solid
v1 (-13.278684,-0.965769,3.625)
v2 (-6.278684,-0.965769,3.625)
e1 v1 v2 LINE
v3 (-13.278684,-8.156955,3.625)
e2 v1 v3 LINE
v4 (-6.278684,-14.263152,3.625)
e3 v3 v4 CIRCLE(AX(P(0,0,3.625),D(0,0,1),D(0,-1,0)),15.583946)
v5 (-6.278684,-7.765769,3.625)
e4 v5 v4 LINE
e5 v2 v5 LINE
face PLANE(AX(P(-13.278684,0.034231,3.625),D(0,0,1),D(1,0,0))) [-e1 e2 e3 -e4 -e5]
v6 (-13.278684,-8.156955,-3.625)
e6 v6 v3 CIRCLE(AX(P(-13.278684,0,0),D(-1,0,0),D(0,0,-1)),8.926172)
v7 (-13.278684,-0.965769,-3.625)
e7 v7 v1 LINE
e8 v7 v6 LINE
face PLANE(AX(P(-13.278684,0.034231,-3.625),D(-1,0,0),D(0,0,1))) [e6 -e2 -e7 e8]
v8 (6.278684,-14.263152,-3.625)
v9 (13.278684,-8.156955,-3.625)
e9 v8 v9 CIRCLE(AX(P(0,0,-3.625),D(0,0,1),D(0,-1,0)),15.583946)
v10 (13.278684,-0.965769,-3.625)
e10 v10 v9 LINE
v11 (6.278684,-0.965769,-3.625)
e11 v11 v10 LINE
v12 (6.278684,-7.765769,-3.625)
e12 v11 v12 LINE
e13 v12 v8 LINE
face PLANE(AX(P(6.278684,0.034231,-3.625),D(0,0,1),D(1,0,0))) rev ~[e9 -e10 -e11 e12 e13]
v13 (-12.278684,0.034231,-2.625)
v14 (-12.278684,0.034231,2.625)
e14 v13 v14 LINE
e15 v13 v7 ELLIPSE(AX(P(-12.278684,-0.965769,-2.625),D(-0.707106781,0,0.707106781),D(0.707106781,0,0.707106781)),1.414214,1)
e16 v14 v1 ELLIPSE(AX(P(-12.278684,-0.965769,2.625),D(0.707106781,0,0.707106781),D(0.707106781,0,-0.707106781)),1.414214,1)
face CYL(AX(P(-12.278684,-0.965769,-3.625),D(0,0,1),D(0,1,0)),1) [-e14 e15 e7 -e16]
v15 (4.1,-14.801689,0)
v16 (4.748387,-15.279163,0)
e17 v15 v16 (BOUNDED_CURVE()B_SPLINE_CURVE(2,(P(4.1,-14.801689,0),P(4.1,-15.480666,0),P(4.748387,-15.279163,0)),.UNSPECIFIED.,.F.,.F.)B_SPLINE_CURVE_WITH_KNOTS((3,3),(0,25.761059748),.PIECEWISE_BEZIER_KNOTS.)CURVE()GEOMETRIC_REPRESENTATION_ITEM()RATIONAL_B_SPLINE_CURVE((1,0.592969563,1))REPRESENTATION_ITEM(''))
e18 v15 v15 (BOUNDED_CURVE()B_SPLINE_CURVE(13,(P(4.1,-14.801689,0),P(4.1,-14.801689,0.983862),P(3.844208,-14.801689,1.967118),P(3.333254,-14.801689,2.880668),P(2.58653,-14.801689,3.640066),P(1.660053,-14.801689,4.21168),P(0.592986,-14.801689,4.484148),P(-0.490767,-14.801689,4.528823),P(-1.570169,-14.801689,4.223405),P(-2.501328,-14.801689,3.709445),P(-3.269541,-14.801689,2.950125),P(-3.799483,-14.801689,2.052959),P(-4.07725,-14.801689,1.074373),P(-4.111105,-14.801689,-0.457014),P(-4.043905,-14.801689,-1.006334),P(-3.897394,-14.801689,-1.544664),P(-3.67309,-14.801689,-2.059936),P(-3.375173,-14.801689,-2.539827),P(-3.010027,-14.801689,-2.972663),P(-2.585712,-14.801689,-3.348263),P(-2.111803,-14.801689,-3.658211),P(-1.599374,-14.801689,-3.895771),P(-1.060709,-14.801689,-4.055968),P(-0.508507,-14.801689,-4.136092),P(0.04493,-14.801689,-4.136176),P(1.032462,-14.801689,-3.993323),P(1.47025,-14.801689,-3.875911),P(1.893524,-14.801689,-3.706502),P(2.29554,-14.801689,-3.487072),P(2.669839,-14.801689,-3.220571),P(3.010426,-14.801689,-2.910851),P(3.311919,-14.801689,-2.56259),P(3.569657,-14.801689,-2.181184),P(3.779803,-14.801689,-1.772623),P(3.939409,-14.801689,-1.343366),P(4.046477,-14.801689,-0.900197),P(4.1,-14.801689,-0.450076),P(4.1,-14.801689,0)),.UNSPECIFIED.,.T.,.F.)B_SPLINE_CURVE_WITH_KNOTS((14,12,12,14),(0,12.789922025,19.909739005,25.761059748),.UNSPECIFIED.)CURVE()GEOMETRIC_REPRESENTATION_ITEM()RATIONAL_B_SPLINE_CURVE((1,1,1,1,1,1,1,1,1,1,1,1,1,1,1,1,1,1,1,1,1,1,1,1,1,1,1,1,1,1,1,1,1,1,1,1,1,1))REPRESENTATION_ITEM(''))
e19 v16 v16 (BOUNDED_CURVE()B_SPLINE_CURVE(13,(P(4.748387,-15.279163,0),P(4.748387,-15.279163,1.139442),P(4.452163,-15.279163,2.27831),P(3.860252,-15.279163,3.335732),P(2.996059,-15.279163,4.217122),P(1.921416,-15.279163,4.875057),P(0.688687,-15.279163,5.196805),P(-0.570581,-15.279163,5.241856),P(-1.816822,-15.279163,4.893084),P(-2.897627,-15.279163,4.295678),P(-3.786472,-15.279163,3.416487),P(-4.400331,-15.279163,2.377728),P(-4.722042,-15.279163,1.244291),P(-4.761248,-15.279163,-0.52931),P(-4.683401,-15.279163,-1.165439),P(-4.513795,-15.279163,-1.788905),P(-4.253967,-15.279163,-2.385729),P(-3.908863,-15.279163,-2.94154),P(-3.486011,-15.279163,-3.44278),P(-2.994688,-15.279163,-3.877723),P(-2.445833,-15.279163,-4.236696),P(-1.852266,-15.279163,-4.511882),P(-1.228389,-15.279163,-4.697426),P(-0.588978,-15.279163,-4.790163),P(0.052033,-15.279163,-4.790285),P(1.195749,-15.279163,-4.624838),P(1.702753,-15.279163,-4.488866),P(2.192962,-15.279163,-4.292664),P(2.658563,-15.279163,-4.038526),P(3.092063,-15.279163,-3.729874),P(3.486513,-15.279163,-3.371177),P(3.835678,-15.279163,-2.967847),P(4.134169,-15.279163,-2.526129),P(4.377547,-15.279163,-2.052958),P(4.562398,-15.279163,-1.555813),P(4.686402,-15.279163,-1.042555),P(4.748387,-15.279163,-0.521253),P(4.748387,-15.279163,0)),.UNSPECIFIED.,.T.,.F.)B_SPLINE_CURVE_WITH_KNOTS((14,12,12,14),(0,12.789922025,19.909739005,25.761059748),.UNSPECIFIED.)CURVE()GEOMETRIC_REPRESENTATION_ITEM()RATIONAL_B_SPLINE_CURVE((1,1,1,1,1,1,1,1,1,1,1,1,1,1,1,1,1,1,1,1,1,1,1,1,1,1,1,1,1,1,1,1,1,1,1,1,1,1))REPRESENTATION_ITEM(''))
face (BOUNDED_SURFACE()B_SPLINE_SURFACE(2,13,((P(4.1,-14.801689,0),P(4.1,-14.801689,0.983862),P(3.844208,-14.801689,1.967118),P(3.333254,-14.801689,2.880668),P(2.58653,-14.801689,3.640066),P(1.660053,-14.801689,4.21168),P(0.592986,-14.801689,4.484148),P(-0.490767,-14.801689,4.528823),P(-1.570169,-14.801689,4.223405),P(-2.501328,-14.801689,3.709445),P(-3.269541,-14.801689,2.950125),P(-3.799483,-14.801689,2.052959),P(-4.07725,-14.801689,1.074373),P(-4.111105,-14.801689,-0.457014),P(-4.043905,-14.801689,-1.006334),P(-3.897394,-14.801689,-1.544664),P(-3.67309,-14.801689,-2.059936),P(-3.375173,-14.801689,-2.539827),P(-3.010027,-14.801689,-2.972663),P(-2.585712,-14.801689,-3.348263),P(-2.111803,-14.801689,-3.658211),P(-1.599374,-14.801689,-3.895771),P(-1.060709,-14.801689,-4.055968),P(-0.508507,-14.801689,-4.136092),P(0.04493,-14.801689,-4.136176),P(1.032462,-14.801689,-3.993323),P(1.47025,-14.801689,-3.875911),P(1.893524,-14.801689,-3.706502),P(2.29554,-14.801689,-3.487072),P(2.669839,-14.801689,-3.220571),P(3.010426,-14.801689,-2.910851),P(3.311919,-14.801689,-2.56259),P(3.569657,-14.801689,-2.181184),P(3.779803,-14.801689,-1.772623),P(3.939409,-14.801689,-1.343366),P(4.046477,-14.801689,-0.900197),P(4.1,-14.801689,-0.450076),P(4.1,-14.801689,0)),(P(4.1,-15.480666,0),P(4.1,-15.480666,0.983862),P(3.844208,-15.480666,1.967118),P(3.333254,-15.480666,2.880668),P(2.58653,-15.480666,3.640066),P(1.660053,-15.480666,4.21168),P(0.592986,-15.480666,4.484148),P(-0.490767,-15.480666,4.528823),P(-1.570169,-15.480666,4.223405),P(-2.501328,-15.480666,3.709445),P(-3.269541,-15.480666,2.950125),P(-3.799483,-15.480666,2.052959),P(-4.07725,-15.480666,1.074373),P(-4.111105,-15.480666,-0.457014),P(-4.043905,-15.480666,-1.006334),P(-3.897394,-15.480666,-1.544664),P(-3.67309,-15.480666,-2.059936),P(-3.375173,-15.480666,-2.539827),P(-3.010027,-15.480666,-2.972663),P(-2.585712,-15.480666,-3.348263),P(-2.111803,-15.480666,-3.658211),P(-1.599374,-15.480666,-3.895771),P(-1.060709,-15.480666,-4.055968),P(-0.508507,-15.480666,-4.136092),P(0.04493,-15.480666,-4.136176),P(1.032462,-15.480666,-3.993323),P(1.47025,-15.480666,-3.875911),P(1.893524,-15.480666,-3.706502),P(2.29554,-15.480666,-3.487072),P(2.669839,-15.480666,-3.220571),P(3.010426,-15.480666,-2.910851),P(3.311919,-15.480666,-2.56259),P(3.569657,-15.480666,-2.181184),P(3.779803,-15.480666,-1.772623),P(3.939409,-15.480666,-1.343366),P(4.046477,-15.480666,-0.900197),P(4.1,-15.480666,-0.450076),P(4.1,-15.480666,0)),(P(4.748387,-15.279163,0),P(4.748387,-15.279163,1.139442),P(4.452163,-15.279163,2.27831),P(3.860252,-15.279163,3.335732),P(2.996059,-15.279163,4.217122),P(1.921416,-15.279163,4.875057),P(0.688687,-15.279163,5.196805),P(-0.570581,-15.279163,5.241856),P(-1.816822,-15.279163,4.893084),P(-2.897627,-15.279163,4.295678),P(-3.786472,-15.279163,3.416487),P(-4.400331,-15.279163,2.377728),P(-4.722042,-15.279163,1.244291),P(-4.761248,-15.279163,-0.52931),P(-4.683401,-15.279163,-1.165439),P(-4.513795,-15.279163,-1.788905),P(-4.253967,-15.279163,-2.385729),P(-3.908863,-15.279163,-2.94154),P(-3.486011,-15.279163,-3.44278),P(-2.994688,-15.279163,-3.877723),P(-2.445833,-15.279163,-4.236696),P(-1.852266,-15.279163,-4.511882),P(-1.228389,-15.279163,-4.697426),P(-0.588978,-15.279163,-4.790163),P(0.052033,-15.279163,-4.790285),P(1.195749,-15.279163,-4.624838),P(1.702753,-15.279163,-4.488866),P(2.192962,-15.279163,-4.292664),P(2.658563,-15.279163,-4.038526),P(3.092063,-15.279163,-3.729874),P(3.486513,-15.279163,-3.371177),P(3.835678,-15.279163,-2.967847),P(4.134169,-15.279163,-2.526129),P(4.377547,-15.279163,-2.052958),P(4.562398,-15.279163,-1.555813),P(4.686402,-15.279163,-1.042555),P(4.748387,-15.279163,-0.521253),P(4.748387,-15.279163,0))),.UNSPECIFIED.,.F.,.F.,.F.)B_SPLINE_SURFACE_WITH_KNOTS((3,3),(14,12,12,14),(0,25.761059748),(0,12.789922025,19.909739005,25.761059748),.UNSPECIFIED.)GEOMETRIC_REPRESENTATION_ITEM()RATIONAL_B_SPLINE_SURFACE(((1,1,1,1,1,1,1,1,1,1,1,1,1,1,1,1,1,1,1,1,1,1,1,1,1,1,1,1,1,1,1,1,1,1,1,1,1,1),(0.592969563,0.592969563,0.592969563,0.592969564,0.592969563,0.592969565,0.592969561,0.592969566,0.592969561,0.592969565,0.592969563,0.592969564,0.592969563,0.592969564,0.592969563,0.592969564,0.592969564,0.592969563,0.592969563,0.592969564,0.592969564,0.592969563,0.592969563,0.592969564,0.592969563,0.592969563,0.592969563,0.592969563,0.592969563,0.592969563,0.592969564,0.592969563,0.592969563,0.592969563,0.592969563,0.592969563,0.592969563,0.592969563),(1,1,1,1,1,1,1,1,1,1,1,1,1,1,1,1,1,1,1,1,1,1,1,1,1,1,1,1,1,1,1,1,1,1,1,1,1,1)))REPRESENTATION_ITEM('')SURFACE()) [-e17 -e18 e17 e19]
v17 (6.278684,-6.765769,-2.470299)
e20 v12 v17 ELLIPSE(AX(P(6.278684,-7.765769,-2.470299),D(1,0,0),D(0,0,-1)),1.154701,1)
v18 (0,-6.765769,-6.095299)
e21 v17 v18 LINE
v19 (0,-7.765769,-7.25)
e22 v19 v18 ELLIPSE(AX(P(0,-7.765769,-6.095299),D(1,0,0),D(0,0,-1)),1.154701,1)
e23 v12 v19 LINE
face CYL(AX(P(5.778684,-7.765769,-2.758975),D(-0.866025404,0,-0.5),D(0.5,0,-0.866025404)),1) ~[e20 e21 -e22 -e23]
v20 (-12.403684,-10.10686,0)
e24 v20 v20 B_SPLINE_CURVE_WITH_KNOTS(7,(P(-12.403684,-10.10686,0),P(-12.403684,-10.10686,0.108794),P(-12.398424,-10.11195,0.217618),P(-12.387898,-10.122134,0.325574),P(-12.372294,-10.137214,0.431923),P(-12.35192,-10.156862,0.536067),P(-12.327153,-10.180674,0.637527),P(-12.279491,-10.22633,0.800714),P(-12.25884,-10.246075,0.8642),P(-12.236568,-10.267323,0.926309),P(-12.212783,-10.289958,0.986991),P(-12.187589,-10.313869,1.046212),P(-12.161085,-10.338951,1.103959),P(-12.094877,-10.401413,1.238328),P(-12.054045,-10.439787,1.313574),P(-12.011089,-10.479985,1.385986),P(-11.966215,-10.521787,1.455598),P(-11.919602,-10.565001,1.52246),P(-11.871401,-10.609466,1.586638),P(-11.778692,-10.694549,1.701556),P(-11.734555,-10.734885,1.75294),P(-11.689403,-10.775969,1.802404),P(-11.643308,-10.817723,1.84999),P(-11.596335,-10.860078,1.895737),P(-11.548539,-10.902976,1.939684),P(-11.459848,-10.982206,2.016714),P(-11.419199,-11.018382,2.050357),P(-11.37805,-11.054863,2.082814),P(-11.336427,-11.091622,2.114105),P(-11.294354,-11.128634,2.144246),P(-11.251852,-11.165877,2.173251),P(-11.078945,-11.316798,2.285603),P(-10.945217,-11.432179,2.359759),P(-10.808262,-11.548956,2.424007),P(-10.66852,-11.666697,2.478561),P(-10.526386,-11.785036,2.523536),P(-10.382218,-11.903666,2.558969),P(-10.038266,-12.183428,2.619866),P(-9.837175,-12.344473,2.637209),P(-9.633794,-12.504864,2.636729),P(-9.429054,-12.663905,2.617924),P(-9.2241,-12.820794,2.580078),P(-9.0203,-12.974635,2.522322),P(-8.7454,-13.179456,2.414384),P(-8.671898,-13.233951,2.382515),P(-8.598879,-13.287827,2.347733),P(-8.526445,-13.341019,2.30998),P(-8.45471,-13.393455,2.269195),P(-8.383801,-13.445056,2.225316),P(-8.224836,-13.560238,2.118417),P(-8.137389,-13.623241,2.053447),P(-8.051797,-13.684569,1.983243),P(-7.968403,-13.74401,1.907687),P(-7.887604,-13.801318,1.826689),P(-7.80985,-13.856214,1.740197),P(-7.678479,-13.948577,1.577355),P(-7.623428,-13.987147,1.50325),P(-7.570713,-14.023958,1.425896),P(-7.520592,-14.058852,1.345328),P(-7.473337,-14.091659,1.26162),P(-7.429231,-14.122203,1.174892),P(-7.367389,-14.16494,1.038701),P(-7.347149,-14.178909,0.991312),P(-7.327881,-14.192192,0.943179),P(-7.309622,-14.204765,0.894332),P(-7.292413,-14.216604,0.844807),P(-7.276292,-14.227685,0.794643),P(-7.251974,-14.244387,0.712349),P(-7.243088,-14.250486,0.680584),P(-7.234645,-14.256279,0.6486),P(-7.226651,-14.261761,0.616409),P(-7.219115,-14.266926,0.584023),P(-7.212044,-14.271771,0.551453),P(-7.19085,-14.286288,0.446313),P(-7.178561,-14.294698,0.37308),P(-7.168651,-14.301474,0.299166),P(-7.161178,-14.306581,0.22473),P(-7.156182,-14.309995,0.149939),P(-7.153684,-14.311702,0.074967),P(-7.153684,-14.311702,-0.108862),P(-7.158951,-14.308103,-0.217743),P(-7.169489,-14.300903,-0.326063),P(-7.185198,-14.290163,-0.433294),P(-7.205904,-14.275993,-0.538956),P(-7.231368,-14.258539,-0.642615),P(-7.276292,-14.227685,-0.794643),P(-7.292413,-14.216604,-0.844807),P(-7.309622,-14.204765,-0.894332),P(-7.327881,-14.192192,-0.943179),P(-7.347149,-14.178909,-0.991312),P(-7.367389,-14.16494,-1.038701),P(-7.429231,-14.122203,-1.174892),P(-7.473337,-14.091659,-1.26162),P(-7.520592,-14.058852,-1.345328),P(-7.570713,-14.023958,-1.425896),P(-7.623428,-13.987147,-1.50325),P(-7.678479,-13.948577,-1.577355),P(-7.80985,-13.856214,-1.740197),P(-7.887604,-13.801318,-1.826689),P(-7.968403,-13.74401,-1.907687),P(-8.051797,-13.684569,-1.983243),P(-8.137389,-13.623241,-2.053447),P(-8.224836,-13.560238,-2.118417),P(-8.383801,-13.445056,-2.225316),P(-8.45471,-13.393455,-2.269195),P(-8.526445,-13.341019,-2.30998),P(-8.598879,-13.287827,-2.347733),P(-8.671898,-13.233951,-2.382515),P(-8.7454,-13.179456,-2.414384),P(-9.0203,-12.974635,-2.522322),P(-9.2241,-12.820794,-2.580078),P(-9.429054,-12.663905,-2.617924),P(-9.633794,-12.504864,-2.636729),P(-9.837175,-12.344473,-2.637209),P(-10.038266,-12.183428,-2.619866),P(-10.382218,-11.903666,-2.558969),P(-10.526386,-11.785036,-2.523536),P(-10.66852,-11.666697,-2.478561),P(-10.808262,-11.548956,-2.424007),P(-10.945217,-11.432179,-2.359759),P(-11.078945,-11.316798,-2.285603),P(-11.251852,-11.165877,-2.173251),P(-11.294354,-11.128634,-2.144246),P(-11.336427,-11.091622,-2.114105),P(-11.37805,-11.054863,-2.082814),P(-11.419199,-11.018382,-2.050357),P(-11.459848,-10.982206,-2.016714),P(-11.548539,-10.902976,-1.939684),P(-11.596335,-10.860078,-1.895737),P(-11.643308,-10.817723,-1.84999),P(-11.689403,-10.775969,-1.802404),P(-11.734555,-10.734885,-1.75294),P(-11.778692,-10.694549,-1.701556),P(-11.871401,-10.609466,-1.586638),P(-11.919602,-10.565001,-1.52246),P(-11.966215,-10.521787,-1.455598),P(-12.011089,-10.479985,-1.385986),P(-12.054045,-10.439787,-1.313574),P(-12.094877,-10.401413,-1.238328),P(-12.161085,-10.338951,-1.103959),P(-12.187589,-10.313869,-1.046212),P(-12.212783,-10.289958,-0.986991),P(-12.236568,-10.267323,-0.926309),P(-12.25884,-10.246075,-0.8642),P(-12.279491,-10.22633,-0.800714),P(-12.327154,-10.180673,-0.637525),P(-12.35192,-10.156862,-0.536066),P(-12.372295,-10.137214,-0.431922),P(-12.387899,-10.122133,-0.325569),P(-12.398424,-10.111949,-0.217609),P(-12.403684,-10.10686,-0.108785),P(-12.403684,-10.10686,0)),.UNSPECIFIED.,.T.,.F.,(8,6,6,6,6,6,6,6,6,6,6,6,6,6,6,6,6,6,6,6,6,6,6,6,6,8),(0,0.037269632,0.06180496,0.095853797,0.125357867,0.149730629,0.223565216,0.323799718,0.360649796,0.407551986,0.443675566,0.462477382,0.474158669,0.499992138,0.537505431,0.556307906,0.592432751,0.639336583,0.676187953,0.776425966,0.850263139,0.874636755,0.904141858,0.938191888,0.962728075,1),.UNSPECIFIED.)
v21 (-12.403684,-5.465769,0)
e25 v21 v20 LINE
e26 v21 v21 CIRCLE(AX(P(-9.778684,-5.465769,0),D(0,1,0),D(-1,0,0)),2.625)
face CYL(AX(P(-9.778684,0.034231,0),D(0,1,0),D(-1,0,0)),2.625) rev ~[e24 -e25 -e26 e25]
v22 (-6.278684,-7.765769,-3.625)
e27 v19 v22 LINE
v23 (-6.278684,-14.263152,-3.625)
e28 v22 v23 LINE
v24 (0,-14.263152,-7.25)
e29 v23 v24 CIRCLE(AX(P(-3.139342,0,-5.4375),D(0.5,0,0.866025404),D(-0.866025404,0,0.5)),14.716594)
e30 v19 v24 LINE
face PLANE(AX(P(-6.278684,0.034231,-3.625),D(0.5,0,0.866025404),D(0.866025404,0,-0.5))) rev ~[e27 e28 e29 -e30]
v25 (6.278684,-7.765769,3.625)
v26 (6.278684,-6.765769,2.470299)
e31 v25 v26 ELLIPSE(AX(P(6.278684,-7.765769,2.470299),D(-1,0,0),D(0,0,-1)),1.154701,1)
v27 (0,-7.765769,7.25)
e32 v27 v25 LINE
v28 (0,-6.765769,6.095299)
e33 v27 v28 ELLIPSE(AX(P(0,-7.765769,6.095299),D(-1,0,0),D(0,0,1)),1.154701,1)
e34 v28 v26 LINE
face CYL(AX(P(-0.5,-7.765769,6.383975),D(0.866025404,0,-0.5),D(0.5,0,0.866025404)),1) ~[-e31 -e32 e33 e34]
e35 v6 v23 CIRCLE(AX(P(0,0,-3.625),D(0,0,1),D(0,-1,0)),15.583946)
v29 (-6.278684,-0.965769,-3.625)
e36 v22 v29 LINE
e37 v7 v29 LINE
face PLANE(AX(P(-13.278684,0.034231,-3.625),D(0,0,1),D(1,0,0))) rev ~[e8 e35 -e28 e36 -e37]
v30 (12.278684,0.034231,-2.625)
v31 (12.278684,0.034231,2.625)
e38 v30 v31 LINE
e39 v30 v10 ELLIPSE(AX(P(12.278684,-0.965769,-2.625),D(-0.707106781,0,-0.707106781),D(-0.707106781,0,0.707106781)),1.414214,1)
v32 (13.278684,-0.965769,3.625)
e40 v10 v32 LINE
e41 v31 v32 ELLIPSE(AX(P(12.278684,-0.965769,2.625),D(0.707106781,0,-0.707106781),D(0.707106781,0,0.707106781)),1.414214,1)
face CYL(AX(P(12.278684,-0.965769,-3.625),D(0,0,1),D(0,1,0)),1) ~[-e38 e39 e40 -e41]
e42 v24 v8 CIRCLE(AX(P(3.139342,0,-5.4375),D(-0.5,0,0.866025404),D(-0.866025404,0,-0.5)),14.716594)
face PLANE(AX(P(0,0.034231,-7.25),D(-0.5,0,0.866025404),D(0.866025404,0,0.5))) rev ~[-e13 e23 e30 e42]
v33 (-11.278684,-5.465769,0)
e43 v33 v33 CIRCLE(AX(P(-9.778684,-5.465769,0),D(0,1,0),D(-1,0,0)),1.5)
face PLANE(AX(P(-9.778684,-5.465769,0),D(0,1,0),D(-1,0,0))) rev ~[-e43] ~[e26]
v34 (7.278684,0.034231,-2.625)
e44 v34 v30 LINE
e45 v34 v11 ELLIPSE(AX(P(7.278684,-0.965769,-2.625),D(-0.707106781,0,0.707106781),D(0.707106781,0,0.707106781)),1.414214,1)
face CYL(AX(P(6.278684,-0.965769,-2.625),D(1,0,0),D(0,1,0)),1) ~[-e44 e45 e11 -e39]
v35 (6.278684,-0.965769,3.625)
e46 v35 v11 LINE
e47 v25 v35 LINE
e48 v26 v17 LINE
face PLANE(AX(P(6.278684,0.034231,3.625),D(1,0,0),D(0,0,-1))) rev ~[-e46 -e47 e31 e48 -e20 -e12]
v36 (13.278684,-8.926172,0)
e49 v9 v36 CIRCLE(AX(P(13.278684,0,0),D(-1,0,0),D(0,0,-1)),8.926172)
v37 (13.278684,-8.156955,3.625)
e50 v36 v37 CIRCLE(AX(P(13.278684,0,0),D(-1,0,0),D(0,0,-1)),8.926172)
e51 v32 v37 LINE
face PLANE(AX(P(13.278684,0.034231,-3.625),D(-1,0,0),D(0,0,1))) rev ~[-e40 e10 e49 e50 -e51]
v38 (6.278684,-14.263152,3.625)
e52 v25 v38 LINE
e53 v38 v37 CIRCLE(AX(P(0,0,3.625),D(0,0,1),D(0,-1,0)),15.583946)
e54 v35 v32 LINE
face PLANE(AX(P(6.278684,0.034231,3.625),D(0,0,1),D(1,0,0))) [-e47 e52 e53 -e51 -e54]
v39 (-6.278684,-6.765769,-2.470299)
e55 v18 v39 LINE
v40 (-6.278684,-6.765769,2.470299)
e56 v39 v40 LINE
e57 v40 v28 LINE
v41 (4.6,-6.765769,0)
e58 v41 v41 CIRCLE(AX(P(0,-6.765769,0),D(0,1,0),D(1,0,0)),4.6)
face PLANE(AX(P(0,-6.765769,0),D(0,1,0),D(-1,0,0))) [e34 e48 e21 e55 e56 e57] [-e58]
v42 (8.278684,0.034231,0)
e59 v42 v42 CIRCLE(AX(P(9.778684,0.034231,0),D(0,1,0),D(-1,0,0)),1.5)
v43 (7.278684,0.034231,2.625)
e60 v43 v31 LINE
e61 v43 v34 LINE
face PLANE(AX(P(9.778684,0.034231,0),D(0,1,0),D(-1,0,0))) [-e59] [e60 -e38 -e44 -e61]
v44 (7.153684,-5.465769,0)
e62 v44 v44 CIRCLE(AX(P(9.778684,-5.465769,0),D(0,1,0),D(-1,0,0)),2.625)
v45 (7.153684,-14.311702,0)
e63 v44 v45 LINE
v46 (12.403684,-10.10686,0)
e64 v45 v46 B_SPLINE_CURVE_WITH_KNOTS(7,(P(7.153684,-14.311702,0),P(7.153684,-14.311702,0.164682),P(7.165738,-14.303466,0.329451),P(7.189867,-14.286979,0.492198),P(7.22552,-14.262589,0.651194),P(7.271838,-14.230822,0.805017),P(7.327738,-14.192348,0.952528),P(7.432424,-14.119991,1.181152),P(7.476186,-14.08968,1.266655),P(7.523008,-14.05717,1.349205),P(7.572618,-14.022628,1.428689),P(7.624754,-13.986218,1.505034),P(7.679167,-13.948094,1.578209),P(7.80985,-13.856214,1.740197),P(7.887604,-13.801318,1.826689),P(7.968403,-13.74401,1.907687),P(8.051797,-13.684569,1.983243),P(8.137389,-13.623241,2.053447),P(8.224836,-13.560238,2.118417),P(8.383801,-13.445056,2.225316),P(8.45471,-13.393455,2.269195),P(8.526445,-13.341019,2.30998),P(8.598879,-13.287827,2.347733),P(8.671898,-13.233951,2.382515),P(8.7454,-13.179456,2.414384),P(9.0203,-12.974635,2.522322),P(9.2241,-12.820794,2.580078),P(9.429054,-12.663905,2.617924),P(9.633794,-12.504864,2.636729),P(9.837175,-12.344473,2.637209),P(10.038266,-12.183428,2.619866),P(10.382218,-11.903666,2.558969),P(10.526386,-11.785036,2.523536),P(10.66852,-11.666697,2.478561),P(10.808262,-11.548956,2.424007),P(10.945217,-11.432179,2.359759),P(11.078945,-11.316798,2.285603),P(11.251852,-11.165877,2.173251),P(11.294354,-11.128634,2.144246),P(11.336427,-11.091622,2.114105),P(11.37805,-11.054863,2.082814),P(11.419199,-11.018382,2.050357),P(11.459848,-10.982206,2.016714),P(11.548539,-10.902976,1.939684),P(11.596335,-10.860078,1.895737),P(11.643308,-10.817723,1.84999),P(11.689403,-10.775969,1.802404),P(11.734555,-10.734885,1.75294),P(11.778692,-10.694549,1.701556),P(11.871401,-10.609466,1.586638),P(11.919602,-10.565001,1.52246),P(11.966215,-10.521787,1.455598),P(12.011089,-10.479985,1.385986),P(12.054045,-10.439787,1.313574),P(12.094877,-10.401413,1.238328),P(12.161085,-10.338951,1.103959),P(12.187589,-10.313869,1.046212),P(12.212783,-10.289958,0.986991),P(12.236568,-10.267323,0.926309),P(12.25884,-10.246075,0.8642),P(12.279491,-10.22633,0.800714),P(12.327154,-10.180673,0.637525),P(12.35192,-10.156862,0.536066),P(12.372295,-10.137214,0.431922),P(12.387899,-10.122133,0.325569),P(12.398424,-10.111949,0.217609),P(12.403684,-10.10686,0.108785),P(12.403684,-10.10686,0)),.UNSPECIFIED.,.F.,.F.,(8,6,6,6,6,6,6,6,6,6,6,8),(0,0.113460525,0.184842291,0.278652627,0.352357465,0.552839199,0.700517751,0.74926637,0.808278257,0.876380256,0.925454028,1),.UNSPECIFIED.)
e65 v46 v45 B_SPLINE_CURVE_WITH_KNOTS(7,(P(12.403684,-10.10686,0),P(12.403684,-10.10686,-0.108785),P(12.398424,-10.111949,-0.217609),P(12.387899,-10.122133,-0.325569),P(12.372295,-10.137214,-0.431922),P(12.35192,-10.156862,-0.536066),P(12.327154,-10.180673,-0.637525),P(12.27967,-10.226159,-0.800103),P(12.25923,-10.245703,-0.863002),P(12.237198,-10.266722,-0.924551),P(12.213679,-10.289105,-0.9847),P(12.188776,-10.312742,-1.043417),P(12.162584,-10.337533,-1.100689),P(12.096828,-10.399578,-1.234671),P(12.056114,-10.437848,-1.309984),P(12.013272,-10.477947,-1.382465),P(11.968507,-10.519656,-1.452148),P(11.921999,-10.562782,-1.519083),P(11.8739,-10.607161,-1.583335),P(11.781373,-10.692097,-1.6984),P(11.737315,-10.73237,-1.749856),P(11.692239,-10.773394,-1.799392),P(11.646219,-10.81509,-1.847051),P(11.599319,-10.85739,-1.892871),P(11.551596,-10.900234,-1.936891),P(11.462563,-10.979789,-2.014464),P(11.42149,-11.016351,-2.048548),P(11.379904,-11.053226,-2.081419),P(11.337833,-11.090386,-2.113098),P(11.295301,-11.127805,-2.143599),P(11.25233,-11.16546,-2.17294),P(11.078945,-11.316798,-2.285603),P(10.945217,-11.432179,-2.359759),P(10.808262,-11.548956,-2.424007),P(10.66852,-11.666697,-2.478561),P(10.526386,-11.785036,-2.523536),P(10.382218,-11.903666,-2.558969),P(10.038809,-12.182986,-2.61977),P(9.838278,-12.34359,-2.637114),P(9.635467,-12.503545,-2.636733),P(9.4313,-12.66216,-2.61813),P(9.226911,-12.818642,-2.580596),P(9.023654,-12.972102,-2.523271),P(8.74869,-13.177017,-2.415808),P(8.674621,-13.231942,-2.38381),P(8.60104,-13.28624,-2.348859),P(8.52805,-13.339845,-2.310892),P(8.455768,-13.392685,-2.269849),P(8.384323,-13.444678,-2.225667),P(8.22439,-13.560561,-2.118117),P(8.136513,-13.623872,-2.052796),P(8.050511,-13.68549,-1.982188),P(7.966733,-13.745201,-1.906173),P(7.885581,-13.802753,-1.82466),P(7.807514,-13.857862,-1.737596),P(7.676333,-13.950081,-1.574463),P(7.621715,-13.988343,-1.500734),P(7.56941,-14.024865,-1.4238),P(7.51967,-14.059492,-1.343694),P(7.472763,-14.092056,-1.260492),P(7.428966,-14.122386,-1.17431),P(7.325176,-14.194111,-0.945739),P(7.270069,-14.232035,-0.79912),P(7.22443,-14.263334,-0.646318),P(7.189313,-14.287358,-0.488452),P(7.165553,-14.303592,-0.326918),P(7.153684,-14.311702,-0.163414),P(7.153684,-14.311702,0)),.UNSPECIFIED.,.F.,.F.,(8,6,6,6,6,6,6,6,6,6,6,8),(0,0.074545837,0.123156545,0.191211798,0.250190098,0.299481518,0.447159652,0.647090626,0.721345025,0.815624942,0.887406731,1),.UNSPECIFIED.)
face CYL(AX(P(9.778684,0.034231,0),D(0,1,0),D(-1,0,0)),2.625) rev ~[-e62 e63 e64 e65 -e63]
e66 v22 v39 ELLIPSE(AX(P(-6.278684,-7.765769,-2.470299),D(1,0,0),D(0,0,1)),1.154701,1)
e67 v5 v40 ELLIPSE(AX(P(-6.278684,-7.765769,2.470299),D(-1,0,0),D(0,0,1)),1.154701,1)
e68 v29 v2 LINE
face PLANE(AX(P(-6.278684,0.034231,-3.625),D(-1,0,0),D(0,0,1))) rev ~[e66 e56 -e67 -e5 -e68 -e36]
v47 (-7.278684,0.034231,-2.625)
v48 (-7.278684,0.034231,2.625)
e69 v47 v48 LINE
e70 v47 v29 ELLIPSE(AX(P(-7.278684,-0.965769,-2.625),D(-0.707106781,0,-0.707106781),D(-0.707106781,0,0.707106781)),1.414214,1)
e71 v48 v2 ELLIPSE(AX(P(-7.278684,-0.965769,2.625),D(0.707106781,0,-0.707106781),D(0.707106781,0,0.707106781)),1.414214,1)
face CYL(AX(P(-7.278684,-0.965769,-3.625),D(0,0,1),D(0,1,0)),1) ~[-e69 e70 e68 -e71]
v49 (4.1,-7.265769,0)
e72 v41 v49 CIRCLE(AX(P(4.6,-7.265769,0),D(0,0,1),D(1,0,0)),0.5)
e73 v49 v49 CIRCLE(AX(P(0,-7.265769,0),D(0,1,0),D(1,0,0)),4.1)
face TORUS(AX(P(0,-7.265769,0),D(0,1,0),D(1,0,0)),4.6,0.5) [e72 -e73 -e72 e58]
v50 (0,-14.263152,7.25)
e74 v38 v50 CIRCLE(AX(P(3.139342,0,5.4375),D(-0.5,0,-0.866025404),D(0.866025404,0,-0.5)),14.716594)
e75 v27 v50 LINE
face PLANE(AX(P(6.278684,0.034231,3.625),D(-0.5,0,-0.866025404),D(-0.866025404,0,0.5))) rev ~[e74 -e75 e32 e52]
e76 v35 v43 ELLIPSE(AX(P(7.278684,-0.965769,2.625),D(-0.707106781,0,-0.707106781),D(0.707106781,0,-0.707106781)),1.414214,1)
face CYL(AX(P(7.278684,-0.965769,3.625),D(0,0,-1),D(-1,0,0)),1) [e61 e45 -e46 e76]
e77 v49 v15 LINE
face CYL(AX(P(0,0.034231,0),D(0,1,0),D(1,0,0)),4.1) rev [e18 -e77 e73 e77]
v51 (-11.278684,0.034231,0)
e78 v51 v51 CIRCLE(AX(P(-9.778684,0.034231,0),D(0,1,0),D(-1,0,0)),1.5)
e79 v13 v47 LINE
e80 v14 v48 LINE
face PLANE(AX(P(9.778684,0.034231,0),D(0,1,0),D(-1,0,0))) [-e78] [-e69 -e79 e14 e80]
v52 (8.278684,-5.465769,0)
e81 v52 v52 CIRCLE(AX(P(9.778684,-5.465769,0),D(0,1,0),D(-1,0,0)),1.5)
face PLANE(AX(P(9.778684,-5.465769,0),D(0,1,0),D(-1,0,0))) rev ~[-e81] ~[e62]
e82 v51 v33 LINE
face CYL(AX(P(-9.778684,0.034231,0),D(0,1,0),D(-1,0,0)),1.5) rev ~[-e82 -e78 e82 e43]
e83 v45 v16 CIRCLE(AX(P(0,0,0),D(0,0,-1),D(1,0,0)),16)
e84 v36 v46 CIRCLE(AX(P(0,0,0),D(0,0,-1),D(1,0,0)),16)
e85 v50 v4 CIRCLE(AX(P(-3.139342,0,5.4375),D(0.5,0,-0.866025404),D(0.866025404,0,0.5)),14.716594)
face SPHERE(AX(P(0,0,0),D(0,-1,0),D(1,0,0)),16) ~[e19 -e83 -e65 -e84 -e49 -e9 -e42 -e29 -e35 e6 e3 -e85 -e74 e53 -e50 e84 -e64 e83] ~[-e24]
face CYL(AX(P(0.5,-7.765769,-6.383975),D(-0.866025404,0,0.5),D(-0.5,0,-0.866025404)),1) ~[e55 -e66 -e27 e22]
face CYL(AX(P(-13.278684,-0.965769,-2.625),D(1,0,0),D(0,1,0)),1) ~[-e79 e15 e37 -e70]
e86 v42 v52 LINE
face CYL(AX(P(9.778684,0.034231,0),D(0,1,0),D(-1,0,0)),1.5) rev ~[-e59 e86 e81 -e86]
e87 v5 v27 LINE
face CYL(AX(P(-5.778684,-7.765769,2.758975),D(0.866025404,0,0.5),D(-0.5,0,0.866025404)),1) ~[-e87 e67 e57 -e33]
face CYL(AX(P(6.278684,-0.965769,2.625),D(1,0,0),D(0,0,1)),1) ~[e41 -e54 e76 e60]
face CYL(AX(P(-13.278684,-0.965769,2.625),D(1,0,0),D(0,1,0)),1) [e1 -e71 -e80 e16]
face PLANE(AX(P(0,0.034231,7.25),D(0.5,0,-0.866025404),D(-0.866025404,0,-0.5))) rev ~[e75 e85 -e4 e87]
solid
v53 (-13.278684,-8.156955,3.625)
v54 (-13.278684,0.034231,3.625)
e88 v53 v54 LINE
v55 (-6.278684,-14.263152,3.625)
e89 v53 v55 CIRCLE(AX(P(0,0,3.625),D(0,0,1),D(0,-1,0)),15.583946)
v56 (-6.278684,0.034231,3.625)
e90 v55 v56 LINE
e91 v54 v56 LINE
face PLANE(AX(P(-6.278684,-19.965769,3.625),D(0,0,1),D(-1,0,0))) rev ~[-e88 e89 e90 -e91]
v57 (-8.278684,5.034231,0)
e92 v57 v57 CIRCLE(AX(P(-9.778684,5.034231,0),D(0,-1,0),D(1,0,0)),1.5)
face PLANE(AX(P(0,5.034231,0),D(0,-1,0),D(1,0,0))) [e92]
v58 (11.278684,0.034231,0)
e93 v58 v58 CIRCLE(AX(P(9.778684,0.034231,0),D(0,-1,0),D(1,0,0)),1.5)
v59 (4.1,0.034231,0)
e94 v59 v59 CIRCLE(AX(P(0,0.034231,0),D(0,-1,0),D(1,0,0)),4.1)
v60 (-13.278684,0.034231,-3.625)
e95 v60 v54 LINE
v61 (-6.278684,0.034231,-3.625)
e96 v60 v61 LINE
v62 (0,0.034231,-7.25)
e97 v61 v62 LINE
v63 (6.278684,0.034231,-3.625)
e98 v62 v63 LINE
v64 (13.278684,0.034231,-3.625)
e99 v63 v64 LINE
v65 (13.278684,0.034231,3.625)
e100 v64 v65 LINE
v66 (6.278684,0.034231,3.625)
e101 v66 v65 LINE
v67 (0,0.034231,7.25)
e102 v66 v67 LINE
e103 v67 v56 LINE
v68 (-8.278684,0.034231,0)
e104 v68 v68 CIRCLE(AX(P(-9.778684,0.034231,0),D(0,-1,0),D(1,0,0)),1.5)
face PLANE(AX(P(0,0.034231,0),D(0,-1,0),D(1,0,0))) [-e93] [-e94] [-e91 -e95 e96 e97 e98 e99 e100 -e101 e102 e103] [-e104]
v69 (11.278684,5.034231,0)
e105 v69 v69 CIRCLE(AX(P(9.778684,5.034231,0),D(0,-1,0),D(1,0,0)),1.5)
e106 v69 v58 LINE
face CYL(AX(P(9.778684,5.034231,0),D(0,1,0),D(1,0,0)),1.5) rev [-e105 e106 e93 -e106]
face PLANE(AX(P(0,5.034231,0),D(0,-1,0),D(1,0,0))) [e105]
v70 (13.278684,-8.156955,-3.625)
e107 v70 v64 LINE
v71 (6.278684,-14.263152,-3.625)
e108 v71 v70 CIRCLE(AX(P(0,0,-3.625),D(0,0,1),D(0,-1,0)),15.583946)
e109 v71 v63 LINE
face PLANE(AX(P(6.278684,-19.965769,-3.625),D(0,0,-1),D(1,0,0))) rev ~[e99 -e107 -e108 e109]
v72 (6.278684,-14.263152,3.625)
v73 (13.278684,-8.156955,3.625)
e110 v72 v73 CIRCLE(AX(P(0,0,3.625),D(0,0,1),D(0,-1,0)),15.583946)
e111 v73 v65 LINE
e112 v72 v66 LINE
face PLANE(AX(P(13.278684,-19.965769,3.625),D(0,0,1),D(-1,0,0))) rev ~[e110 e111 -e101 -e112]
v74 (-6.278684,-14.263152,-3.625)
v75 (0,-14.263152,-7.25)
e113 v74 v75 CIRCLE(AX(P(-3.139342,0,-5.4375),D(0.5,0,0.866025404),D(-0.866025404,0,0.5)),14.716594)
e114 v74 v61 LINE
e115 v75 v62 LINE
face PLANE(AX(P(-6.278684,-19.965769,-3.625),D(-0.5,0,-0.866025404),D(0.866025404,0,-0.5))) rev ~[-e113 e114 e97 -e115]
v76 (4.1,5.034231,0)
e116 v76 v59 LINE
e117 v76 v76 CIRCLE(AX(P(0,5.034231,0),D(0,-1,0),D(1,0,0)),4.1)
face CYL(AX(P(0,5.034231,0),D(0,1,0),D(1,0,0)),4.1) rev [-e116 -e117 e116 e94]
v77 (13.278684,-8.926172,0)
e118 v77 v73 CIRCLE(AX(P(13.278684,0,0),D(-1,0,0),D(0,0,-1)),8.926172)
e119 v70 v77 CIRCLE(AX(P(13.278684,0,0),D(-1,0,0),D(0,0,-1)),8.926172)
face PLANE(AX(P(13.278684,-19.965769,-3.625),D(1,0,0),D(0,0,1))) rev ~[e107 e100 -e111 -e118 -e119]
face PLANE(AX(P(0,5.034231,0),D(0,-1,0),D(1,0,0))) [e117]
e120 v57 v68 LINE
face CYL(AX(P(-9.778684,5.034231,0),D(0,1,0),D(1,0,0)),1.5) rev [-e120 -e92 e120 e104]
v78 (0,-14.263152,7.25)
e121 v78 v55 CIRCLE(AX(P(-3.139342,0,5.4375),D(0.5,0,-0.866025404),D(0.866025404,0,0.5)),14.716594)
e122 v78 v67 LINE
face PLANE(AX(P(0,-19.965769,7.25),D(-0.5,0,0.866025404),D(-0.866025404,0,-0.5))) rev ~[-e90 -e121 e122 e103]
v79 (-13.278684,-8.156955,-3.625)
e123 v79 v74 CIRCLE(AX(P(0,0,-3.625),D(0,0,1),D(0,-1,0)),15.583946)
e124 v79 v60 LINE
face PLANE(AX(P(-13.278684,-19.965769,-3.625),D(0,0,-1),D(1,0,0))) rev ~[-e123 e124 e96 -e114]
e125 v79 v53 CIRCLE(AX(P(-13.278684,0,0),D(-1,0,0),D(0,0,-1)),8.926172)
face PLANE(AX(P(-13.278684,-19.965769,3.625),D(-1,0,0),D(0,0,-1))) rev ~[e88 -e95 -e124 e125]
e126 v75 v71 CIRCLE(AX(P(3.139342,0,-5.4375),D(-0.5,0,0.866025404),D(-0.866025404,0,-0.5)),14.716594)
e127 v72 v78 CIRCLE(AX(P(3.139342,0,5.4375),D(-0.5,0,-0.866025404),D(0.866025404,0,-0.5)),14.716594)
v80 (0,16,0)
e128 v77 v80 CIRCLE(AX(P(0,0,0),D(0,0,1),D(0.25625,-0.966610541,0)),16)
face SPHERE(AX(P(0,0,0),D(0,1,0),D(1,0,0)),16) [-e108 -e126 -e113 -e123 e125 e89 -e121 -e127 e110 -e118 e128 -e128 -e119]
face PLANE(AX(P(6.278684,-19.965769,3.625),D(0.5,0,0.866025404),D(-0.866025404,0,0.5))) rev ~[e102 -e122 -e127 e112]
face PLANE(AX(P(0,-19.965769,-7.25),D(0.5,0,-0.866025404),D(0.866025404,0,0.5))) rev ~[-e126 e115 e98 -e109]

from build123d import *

# Parameters (mm, degrees)
F2_DEPTH  = 20.5
F3_W      = 7
F3_H      = 7.25
F3_R      = 1.5
F4_DEPTH  = 25
F5_R      = 1.5
F6_DEPTH  = 25
F3_R_2    = 4.1
F7_DEPTH  = 5
F9_DEPTH  = 25
F11_R     = 2.625
F11_R_2   = 1.5
F12_DEPTH = 25
F13_DEPTH = 5.5
F14_R     = 0.5
F11_R_3   = 4.1
F15_DEPTH = 6.8
F16_R     = 1
F17_R     = 0.5


with BuildPart() as f1:
    # F0 (on Top) → F1 (revolve)
    with BuildSketch(Plane.XY):
        with BuildLine():
            Line((0, -15.4657686521), (4.1, -15.4657686521))
            ThreePointArc((4.1, -15.4657686521), (15.8658800328, 2.0673293843), (0, 16))
            Line((0, 16), (0, -15.4657686521))
        make_face()
    revolve(axis=Axis((0, 0.267115674, 0), (0, 1, 0)))

    # F2 (cut): a face of the model
    f2_faces = [f1.faces().sort_by_distance(p)[0] for p in [
        (0, -15.4657686521, 0),
    ]]
    extrude(f2_faces, amount=-F2_DEPTH, mode=Mode.SUBTRACT)

    # F3 (on face) → F4 (join)
    with BuildSketch(Plane.XZ.offset(-5.0342313479)):
        Polygon((6.2786841774, 3.625), (0, 7.25), (-6.2786841774, 3.625), (-6.2786841774, -3.625), (0, -7.25), (6.2786841774, -3.625), align=None)
        with Locations((-9.7786841774, 0)):
            Rectangle(F3_W, F3_H)
        with Locations((-9.7786841774, 0)):
            Circle(F3_R, mode=Mode.SUBTRACT)
        with Locations((9.7786841774, 0)):
            Rectangle(F3_W, F3_H)
        with Locations((9.7786841774, 0)):
            Circle(F3_R, mode=Mode.SUBTRACT)
    extrude(amount=F4_DEPTH)

    # F5 (on face) → F6 (cut)
    with BuildSketch(Plane.XZ.offset(19.9657686521)):
        Polygon((13.2786841774, 3.625), (6.2786841774, 3.625), (0, 7.25), (-6.2786841774, 3.625), (-13.2786841774, 3.625), (-13.2786841774, -3.625), (-6.2786841774, -3.625), (0, -7.25), (6.2786841774, -3.625), (13.2786841774, -3.625), align=None)
        with Locations((-9.7786841774, 0)):
            Circle(F5_R, mode=Mode.SUBTRACT)
        with Locations((9.7786841774, 0)):
            Circle(F5_R, mode=Mode.SUBTRACT)
        with Locations((-9.7786841774, 0)):
            Circle(F5_R)
        with Locations((9.7786841774, 0)):
            Circle(F5_R)
    extrude(amount=-F6_DEPTH, mode=Mode.SUBTRACT)

    # F3 (on face) → F7 (join)
    with BuildSketch(Plane.XZ.offset(-5.0342313479)):
        Polygon((6.2786841774, 3.625), (0, 7.25), (-6.2786841774, 3.625), (-6.2786841774, -3.625), (0, -7.25), (6.2786841774, -3.625), align=None)
        Circle(F3_R_2, mode=Mode.SUBTRACT)
        with Locations((-9.7786841774, 0)):
            Rectangle(F3_W, F3_H)
        with Locations((-9.7786841774, 0)):
            Circle(F3_R, mode=Mode.SUBTRACT)
        with Locations((9.7786841774, 0)):
            Rectangle(F3_W, F3_H)
        with Locations((9.7786841774, 0)):
            Circle(F3_R, mode=Mode.SUBTRACT)
    extrude(amount=F7_DEPTH)


with BuildPart() as f9:
    # F9 (new): a face of the model
    f9_faces = [f1.part.faces().sort_by_distance(p)[0] for p in [
        (2.9880523159, 0.0342313479, 5.1754584269),
    ]]
    extrude(f9_faces, amount=F9_DEPTH)

    # F8 (on Top) → F10 (revolve, cut)
    with BuildSketch(Plane.XY):
        with BuildLine():
            ThreePointArc((0, 16), (11.313708499, 11.313708499), (16, 0))
            ThreePointArc((16, 0), (11.313708499, -11.313708499), (0, -16))
            Line((0, -16), (0, -32.4343107641))
            Line((0, -32.4343107641), (22.5159879774, -32.4343107641))
            Line((22.5159879774, -32.4343107641), (22.5159879774, 32.4343107641))
            Line((22.5159879774, 32.4343107641), (0, 32.4343107641))
            Line((0, 32.4343107641), (0, 16))
        make_face()
    revolve(axis=Axis((0, 0, 0), (0, 1, 0)), mode=Mode.SUBTRACT)

    # F11 (on face) → F12 (cut)
    with BuildSketch(Plane(origin=(0, 0.0342313479, 0), x_dir=(-1, 0, 0), z_dir=(0, 1, 0))):
        with Locations((-9.7786841774, 0)):
            Circle(F11_R)
        with Locations((-9.7786841774, 0)):
            Circle(F11_R_2, mode=Mode.SUBTRACT)
        with Locations((9.7786841774, 0)):
            Circle(F11_R)
        with Locations((9.7786841774, 0)):
            Circle(F11_R_2, mode=Mode.SUBTRACT)
    extrude(amount=-F12_DEPTH, mode=Mode.SUBTRACT)

    # F11 (on face) → F13 (join)
    with BuildSketch(Plane(origin=(0, 0.0342313479, 0), x_dir=(-1, 0, 0), z_dir=(0, 1, 0))):
        with Locations((-9.7786841774, 0)):
            Circle(F11_R)
        with Locations((-9.7786841774, 0)):
            Circle(F11_R_2, mode=Mode.SUBTRACT)
        with Locations((9.7786841774, 0)):
            Circle(F11_R)
        with Locations((9.7786841774, 0)):
            Circle(F11_R_2, mode=Mode.SUBTRACT)
    extrude(amount=-F13_DEPTH)

    # F14
    f14_edges = [f9.edges().sort_by_distance(p)[0] for p in [
        (-4.1, -15.465769, 0),
    ]]
    fillet(f14_edges, radius=F14_R)

    # F11 (on face) → F15 (cut)
    with BuildSketch(Plane(origin=(0, 0.0342313479, 0), x_dir=(-1, 0, 0), z_dir=(0, 1, 0))):
        Polygon((-6.2786841774, 3.625), (-6.2786841774, -3.625), (0, -7.25), (6.2786841774, -3.625), (6.2786841774, 3.625), (0, 7.25), align=None)
        Circle(F11_R_3, mode=Mode.SUBTRACT)
    extrude(amount=-F15_DEPTH, mode=Mode.SUBTRACT)

    # F16
    f16_edges = [f9.edges().sort_by_distance(p)[0] for p in [
        (13.278684, 0.034231, 0),
        (9.778684, 0.034231, -3.625),
        (6.278684, 0.034231, 0),
        (9.778684, 0.034231, 3.625),
        (-6.278684, 0.034231, 0),
        (-9.778684, 0.034231, 3.625),
        (-13.278684, 0.034231, 0),
        (-9.778684, 0.034231, -3.625),
        (-3.139342, -6.765769, 5.4375),
        (3.139342, -6.765769, -5.4375),
        (-3.139342, -6.765769, -5.4375),
        (3.139342, -6.765769, 5.4375),
    ]]
    fillet(f16_edges, radius=F16_R)

    # F17
    f17_edges = [f9.edges().sort_by_distance(p)[0] for p in [
        (-4.1, -6.765769, 0),
    ]]
    fillet(f17_edges, radius=F17_R)


solid = Compound([f1.part, f9.part])
